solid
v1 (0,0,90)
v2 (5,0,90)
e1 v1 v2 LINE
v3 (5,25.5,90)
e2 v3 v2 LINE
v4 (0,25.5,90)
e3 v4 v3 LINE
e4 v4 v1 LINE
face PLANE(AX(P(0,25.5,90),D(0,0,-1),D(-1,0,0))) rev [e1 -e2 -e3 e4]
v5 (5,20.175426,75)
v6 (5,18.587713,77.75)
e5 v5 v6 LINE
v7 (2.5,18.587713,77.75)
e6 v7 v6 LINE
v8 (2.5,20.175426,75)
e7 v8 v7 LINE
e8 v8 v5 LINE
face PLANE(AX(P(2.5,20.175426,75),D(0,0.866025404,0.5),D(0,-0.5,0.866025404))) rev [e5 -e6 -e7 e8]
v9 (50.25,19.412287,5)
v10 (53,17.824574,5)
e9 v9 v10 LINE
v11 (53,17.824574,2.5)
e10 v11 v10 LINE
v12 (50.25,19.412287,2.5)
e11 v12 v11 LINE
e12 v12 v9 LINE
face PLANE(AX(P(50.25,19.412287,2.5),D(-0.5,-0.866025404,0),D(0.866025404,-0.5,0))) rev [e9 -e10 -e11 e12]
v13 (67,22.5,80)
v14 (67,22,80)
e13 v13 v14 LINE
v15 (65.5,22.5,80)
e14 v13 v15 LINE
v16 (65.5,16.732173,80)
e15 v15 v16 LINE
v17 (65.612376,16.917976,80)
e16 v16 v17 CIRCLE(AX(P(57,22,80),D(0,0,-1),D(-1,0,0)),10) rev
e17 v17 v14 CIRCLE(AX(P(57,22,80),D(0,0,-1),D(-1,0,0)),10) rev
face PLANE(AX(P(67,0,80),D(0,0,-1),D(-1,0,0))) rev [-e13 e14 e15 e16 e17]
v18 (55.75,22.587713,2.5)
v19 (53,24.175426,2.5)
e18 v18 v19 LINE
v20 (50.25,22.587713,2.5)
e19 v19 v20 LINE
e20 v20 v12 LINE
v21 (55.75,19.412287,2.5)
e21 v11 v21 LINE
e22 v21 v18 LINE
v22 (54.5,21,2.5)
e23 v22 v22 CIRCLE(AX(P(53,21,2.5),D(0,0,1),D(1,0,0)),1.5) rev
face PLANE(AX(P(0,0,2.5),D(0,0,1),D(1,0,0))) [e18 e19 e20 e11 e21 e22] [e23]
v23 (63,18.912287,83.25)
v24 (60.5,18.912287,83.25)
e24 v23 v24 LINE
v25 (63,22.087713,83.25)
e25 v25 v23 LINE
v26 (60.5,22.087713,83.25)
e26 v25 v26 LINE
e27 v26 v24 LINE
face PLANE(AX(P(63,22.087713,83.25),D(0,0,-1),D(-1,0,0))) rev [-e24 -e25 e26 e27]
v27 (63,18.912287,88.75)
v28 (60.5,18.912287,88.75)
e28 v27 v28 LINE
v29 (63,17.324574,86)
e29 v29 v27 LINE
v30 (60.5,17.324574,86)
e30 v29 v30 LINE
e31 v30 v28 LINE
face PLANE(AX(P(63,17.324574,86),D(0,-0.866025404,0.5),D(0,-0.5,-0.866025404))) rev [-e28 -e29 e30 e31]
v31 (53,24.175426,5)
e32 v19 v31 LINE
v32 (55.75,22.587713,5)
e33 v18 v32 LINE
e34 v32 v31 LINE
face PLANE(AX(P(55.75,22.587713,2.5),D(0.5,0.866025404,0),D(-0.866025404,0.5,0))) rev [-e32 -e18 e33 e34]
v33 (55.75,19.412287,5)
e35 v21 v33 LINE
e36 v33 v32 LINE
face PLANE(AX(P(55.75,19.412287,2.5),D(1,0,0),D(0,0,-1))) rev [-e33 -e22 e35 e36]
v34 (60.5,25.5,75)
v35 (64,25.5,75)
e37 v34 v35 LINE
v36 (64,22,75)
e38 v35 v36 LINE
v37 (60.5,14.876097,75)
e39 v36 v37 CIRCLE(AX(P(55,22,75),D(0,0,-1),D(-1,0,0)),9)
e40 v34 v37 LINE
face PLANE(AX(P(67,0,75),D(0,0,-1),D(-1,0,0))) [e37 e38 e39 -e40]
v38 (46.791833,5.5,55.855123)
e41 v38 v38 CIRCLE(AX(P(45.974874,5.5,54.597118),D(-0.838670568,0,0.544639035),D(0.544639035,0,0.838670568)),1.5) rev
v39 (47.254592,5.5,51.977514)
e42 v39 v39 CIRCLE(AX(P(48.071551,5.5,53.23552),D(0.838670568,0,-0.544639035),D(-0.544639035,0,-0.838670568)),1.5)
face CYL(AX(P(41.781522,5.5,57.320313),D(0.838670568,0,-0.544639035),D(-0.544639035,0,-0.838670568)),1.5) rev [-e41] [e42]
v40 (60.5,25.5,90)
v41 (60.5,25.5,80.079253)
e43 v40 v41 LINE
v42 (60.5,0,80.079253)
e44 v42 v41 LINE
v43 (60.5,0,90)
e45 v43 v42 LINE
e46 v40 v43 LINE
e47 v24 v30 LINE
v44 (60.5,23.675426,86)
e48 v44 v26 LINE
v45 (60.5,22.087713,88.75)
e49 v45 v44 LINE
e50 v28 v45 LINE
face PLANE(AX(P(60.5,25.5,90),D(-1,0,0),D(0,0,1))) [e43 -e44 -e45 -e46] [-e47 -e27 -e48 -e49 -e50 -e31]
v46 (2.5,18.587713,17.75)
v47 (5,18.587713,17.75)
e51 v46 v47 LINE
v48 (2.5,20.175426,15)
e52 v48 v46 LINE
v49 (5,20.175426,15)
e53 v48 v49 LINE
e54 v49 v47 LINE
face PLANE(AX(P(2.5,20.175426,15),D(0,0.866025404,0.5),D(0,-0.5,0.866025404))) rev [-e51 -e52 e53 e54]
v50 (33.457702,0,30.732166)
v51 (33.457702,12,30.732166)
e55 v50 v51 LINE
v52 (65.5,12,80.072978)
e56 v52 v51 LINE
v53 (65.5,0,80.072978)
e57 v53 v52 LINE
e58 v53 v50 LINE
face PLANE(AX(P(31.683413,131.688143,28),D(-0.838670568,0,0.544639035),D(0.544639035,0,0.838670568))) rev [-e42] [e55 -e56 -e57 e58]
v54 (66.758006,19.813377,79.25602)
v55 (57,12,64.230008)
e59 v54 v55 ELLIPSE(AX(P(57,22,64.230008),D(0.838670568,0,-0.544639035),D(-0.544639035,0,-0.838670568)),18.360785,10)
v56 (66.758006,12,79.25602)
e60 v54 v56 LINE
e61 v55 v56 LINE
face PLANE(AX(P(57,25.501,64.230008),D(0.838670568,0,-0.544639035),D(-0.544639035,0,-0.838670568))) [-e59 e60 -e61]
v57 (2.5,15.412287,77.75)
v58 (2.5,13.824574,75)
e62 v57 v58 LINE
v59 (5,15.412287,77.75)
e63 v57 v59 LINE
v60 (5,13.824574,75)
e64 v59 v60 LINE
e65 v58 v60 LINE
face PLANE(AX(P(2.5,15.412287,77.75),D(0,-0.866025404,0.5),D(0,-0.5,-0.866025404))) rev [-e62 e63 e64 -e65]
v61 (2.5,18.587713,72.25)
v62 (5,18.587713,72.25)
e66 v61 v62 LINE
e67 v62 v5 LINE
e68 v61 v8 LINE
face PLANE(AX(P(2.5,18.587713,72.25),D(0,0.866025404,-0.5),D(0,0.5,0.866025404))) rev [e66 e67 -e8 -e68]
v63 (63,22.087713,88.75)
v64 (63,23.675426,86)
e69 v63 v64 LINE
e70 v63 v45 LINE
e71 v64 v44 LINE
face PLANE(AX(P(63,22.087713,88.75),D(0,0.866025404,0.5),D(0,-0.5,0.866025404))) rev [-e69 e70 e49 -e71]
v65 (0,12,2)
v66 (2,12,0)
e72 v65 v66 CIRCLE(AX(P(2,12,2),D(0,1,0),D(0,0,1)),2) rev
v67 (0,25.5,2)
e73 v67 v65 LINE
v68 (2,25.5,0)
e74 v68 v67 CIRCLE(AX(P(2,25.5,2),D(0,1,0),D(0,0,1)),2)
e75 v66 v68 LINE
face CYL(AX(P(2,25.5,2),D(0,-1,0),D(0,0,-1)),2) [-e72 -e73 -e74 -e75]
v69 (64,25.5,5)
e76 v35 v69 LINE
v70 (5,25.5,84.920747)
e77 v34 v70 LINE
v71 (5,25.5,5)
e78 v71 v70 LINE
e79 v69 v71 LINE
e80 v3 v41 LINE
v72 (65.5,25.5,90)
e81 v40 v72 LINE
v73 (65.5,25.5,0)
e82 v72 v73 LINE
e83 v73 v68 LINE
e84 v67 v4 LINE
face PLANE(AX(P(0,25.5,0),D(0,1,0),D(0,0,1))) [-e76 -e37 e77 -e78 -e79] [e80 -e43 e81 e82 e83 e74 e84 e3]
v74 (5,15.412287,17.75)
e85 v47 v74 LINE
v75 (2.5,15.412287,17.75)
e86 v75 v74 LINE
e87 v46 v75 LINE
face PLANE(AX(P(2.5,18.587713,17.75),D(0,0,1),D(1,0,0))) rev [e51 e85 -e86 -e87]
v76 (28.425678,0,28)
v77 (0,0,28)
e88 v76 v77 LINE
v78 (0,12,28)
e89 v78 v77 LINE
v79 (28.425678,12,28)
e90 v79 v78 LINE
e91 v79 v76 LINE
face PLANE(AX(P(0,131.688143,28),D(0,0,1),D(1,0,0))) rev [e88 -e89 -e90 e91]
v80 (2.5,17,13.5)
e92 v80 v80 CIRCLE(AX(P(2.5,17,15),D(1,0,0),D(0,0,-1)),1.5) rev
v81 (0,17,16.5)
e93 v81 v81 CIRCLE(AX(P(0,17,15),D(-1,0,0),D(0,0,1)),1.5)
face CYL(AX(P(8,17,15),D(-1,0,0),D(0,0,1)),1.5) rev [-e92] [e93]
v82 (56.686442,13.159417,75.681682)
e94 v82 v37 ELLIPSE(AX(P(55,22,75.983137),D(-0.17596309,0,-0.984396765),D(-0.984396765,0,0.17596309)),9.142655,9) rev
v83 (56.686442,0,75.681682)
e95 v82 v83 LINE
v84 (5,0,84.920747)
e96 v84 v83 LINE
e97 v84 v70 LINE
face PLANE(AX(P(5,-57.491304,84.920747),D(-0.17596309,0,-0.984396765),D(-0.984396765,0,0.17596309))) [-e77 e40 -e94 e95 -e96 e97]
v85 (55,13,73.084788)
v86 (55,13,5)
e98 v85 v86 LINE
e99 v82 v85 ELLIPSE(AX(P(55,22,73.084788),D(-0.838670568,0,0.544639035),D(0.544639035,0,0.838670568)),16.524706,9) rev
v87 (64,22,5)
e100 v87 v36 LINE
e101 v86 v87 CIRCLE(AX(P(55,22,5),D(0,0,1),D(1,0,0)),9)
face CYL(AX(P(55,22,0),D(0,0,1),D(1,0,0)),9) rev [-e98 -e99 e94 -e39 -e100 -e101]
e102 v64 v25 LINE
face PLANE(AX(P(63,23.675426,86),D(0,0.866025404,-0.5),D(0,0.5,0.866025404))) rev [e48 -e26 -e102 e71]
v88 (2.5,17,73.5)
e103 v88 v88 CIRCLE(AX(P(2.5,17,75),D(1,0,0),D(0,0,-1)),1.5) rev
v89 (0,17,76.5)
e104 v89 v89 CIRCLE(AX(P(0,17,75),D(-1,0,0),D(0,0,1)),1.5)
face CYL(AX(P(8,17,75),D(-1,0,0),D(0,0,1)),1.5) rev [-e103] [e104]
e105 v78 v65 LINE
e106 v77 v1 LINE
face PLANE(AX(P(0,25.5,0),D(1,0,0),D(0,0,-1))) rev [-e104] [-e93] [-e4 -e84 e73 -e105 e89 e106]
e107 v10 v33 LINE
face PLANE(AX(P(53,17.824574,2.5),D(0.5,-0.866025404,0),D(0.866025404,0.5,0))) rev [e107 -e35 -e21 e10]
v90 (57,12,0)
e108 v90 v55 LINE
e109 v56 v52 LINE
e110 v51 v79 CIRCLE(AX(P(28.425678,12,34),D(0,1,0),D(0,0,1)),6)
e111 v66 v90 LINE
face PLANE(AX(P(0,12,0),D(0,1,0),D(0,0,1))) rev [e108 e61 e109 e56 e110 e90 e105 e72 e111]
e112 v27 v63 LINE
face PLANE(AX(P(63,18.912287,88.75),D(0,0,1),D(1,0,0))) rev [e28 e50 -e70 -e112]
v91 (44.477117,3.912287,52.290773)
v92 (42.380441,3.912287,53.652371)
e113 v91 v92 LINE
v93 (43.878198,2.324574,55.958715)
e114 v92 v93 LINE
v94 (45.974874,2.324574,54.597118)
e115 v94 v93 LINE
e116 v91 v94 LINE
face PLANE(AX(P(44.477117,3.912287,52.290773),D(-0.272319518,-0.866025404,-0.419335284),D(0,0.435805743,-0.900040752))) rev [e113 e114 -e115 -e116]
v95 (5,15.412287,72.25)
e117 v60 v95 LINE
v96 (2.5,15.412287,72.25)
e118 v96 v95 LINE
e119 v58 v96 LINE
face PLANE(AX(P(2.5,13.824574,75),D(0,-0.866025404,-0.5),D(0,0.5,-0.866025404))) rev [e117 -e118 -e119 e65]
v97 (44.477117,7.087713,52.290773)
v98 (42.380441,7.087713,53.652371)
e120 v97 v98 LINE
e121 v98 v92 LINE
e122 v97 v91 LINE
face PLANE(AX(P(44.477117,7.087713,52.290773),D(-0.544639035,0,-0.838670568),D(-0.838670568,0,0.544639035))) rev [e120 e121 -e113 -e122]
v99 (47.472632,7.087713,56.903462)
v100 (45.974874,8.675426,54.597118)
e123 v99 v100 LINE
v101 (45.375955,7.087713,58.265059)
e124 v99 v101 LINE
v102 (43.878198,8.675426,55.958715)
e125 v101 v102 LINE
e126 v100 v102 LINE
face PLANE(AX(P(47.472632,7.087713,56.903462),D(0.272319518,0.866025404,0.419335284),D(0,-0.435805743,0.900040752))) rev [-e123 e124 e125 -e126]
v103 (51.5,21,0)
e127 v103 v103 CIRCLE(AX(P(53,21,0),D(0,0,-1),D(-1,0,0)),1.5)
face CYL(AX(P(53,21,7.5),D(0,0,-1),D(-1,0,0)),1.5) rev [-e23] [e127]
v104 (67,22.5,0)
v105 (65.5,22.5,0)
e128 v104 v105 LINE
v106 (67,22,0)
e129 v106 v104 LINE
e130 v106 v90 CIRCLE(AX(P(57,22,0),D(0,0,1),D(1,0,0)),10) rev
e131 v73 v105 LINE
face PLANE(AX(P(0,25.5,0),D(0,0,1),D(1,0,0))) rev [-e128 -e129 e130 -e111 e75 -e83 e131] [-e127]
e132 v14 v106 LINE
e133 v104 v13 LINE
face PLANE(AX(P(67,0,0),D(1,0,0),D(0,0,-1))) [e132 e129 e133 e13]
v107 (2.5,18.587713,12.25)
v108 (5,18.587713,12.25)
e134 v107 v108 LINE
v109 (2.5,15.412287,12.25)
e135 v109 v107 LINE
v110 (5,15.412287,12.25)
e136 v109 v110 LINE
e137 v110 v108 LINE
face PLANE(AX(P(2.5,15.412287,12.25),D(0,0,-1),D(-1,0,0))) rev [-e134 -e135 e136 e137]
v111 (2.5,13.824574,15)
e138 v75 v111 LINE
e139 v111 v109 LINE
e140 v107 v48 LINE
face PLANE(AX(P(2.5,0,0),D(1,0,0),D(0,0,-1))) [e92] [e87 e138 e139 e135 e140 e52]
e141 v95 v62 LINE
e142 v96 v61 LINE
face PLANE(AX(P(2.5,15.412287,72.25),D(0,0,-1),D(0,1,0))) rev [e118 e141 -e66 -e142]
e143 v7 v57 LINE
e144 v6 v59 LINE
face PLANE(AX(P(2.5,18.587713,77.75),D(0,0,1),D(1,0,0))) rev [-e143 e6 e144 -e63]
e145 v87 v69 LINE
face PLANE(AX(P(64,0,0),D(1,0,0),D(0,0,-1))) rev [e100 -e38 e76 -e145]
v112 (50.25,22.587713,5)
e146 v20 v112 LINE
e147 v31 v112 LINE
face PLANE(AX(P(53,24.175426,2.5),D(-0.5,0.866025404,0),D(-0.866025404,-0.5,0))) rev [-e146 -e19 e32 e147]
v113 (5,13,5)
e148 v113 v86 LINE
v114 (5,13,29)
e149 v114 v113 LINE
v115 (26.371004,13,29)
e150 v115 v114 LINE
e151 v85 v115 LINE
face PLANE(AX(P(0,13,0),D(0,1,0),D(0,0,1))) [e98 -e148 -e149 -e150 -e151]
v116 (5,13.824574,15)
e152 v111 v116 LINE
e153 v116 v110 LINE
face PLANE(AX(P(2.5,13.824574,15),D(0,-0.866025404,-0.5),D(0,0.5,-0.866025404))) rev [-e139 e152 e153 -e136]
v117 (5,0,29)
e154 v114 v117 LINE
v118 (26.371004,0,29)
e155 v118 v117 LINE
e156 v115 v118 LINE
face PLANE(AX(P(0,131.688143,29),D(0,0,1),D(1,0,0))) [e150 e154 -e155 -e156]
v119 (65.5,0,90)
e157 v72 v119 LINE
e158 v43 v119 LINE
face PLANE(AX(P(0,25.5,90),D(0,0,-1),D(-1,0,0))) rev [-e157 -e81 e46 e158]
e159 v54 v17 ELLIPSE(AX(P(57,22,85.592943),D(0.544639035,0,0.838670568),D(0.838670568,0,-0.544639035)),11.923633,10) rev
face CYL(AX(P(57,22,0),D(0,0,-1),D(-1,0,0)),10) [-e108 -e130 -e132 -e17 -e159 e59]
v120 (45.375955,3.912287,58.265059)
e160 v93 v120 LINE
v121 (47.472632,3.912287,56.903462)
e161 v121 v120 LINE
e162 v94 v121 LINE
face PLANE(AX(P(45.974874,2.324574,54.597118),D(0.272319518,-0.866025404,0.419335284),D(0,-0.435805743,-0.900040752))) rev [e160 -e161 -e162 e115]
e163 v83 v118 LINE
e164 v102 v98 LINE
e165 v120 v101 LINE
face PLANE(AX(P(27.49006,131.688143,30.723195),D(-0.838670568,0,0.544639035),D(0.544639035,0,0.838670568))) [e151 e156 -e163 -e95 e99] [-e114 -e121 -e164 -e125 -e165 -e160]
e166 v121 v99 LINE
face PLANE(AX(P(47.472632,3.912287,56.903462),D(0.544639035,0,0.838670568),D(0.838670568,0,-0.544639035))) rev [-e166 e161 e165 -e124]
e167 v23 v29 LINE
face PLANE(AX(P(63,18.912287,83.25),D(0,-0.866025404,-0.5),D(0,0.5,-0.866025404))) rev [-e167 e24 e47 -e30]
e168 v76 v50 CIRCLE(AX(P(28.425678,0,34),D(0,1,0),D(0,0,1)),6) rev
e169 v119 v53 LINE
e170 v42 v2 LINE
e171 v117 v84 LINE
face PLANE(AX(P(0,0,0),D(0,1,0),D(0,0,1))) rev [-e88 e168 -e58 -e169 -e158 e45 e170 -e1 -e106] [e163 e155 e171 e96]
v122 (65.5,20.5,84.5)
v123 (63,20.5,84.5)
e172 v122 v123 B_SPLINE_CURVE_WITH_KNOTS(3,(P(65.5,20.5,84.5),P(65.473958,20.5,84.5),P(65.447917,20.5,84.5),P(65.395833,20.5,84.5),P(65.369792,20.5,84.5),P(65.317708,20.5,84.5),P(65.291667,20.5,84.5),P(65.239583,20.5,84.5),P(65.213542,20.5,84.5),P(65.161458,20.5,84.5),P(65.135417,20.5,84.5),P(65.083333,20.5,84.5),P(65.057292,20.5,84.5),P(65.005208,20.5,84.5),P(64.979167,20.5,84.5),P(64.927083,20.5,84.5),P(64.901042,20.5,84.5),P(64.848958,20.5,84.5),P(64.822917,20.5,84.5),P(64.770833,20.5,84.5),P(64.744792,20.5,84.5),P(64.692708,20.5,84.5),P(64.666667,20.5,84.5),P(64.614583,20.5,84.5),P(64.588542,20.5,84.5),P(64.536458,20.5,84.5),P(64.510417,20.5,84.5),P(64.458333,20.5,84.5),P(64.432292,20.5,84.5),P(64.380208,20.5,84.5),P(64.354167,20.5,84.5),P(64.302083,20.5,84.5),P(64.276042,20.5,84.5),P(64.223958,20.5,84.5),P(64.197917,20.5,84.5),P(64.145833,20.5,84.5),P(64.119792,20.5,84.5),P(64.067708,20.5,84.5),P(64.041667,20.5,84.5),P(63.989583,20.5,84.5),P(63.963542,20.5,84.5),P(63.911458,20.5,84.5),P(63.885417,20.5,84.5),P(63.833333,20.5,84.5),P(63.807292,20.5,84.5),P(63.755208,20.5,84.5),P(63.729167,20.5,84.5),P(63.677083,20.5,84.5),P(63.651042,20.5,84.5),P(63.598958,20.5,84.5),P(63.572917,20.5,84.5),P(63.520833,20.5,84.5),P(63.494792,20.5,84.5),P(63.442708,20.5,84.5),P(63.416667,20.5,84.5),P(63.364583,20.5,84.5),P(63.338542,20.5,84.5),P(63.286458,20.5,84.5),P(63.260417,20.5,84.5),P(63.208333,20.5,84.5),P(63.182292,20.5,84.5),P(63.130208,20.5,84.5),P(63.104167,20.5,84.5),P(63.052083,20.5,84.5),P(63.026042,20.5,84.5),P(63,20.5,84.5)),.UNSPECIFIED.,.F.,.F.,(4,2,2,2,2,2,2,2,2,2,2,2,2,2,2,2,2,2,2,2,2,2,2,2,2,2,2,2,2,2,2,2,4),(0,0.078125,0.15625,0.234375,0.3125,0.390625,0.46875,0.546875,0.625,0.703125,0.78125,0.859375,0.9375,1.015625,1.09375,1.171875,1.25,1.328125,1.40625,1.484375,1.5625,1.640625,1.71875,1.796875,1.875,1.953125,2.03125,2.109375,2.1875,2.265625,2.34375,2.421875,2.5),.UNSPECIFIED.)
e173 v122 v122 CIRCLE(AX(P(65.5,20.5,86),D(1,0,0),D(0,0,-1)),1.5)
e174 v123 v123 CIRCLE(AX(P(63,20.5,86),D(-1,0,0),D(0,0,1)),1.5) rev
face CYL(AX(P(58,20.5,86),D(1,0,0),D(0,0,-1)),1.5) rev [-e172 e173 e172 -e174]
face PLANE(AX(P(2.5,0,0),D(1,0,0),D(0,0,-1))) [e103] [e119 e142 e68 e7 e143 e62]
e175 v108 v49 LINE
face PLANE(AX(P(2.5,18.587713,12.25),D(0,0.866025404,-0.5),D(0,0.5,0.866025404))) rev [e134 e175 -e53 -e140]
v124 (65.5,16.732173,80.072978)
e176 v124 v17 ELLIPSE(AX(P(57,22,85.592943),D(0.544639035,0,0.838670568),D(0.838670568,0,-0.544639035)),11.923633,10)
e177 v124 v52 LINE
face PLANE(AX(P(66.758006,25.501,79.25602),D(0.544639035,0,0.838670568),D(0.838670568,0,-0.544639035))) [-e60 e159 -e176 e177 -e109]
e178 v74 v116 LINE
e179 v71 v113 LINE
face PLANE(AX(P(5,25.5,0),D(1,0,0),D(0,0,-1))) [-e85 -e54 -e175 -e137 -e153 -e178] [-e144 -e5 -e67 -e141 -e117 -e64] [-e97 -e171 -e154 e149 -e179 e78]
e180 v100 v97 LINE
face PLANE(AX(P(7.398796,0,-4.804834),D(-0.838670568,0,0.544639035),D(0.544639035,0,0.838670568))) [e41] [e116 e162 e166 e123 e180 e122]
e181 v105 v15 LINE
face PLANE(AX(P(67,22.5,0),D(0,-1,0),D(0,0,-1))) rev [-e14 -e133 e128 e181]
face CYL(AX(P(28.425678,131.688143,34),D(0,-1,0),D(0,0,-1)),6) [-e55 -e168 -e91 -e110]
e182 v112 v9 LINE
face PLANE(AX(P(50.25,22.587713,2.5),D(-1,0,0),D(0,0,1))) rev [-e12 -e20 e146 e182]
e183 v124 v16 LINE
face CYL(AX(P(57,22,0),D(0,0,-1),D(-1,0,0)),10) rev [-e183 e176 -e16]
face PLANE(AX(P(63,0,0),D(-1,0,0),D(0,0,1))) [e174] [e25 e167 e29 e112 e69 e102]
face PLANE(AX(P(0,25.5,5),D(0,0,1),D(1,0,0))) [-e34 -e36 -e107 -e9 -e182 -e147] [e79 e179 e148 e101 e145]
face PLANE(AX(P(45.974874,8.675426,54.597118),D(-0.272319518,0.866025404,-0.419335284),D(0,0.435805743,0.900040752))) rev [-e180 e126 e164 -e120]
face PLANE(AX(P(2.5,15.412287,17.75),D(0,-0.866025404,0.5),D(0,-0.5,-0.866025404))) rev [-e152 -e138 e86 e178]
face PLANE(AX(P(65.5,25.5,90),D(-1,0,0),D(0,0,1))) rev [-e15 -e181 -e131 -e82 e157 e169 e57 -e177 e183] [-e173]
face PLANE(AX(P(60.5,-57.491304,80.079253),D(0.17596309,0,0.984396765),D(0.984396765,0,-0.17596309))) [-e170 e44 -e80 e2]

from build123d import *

# Parameters (mm, degrees)
ESQUISSE1_W              = 65.5
ESQUISSE1_H              = 90
BOSS_EXTRU_1_DEPTH       = 25.5
CONG_2_R                 = 2
ESQUISSE6_W              = 80
ESQUISSE6_H              = 22.5
BOSS_EXTRU_2_DEPTH       = 1.5
ENL_V_MAT_EXTRU_5_DEPTH  = 12
COQUE1_DEPTH             = 25.5
COQUE1_START             = 13
COQUE1_2_DEPTH           = 12.5
COQUE1_3_OUTLINE_W       = 3.5
COQUE1_3_OUTLINE_H       = 70
COQUE1_3_DEPTH           = 4.5
ENL_V_MAT_EXTRU_12_DEPTH = 12.5
CONG_5_R                 = 9
CONG_4_R                 = 10
BOSS_EXTRU_3_REACH       = 115.01
BOSS_EXTRU_3_END_RADIUS  = 10
ESQUISSE5_R              = 1.5
ENL_V_MAT_EXTRU_4_DEPTH  = 8
CONG_3_R                 = 6
ESQUISSE11_R             = 1.5
ENL_V_MAT_EXTRU_7_DEPTH  = 7.5
ESQUISSE12_R             = 1.5
ENL_V_MAT_EXTRU_8_DEPTH  = 7.5
ENL_V_MAT_EXTRU_9_DEPTH  = 2.5
ENL_V_MAT_EXTRU_10_DEPTH = 2.5
ENL_V_MAT_EXTRU_11_DEPTH = 2.5
BOSS_EXTRU_7_START       = -25.5
BOSS_EXTRU_7_DEPTH       = 25.5
ENL_V_MAT_EXTRU_13_DEPTH = 116.061939841
ESQUISSE21_R             = 1.5
ENL_V_MAT_EXTRU_14_DEPTH = 7.5
ENL_V_MAT_EXTRU_15_DEPTH = 2.5


# Read off the part's stored shape, not the designer's step: Coque1
with BuildPart() as part:
    # Esquisse1 → Boss.-Extru.1 (new body)
    with BuildSketch(Plane(origin=(0, 0, 0), x_dir=(1, 0, 0), z_dir=(0, 1, 0))):
        with Locations((32.75, -45)):
            Rectangle(ESQUISSE1_W, ESQUISSE1_H)
    extrude(amount=BOSS_EXTRU_1_DEPTH)

    # Congé2
    cong_2_edges = [part.edges().sort_by_distance(p)[0] for p in [
        (0, 12.75, 0),
    ]]
    fillet(cong_2_edges, radius=CONG_2_R)

    # Esquisse6 → Boss.-Extru.2 (add)
    with BuildSketch(Plane(origin=(65.5, 0, 0), x_dir=(0, 0, -1), z_dir=(1, 0, 0))):
        with Locations((-40, 11.25)):
            Rectangle(ESQUISSE6_W, ESQUISSE6_H)
    extrude(amount=BOSS_EXTRU_2_DEPTH)

    # Esquisse8 → Enlèv. mat.-Extru.5 (cut)
    with BuildSketch(Plane.XZ):
        Polygon((0, 0), (67, 0), (67, 82.382775564), (31.68341261, 28), (0, 28), align=None)
    extrude(amount=-ENL_V_MAT_EXTRU_5_DEPTH, mode=Mode.SUBTRACT)

    # Coque1 outline → Coque1 (cut)
    with BuildSketch(Plane(origin=(0, 0, 0), x_dir=(1, 0, 0), z_dir=(0, 1, 0))):
        Polygon((60.5, -90), (60.5, -81.554045593), (26.371003739, -29), (5, -29), (5, -90), align=None)
    extrude(amount=COQUE1_DEPTH, mode=Mode.SUBTRACT)

    # Coque1 2 outline → Coque1 2 (cut)
    with BuildSketch(Plane(origin=(0, 0, 0), x_dir=(1, 0, 0), z_dir=(0, 1, 0)).offset(COQUE1_START)):
        Polygon((60.5, -81.554045593), (60.5, -5), (5, -5), (5, -29), (26.371003739, -29), align=None)
    extrude(amount=COQUE1_2_DEPTH, mode=Mode.SUBTRACT)

    # Coque1 3 outline → Coque1 3 (cut)
    with BuildSketch(Plane(origin=(0, 0, 0), x_dir=(1, 0, 0), z_dir=(0, 1, 0)).offset(COQUE1_START)):
        with Locations((62.25, -40)):
            Rectangle(COQUE1_3_OUTLINE_W, COQUE1_3_OUTLINE_H)
    extrude(amount=COQUE1_3_DEPTH, mode=Mode.SUBTRACT)

    # Esquisse17 → Enlèv. mat.-Extru.12 (cut)
    with BuildSketch(Plane(origin=(0, 13, 0), x_dir=(1, 0, 0), z_dir=(0, 1, 0))):
        Polygon((5, -5), (5, -29), (26.371003739, -29), (60.5, -81.554045593), (60.5, -75), (64, -75), (64, -5), align=None)
    extrude(amount=ENL_V_MAT_EXTRU_12_DEPTH, mode=Mode.SUBTRACT)

    # Congé5
    cong_5_edges = [part.edges().sort_by_distance(p)[0] for p in [
        (64, 13, 40),
    ]]
    fillet(cong_5_edges, radius=CONG_5_R)

    # Congé4
    cong_4_edges = [part.edges().sort_by_distance(p)[0] for p in [
        (67, 12, 40),
    ]]
    fillet(cong_4_edges, radius=CONG_4_R)

    # Boss.-Extru.3: up to this cylinder (the profile starts outside it)
    boss_extru_3_end = Plane(origin=(57, 22, 72.615279), z_dir=(0, 0, -1)) * Cylinder(BOSS_EXTRU_3_END_RADIUS, 251.02, mode=Mode.PRIVATE)
    # Esquisse9 → Boss.-Extru.3 (add, up to the surface)
    with BuildSketch(Plane.XZ.offset(-12), mode=Mode.PRIVATE) as boss_extru_3_sk1:
        Polygon((57, 66.984125926), (57, 64.230008238), (66.758005852, 79.256019566), (65.5, 80.072978118), align=None)
    boss_extru_3_tool1 = extrude(boss_extru_3_sk1.sketch, amount=-BOSS_EXTRU_3_REACH, mode=Mode.PRIVATE) - boss_extru_3_end
    add(boss_extru_3_tool1.solids().sort_by_distance((61.571725, 12, 72.615279))[0])

    # Esquisse5 → Enlèv. mat.-Extru.4 (cut)
    with BuildSketch(Plane.ZY):
        with Locations((15, 17)):
            Circle(ESQUISSE5_R)
        with Locations((75, 17)):
            Circle(ESQUISSE5_R)
    extrude(amount=-ENL_V_MAT_EXTRU_4_DEPTH, mode=Mode.SUBTRACT)

    # Congé3
    cong_3_edges = [part.edges().sort_by_distance(p)[0] for p in [
        (31.68341261, 6, 28),
    ]]
    fillet(cong_3_edges, radius=CONG_3_R)

    # Esquisse11 → Enlèv. mat.-Extru.7 (cut)
    with BuildSketch(Plane(origin=(9.495472341, 0, -6.166431839), x_dir=(-0.5446390350150254, 0, -0.8386705679454252), z_dir=(0.8386705679454252, 0, -0.5446390350150254))):
        with Locations((-70.828706829, 5.5)):
            Circle(ESQUISSE11_R)
    extrude(amount=-ENL_V_MAT_EXTRU_7_DEPTH, mode=Mode.SUBTRACT)

    # Esquisse12 → Enlèv. mat.-Extru.8 (cut)
    with BuildSketch(Plane(origin=(65.5, 0, 0), x_dir=(0, 0, -1), z_dir=(1, 0, 0))):
        with Locations((-86, 20.5)):
            Circle(ESQUISSE12_R)
    extrude(amount=-ENL_V_MAT_EXTRU_8_DEPTH, mode=Mode.SUBTRACT)

    # Esquisse13 → Enlèv. mat.-Extru.9 (cut)
    with BuildSketch(Plane(origin=(5, 0, 0), x_dir=(0, 0, -1), z_dir=(1, 0, 0))):
        Polygon((-72.25, 18.58771324), (-75, 20.175426481), (-77.75, 18.58771324), (-77.75, 15.41228676), (-75, 13.824573519), (-72.25, 15.41228676), align=None)
        Polygon((-12.25, 18.58771324), (-15, 20.175426481), (-17.75, 18.58771324), (-17.75, 15.41228676), (-15, 13.824573519), (-12.25, 15.41228676), align=None)
    extrude(amount=-ENL_V_MAT_EXTRU_9_DEPTH, mode=Mode.SUBTRACT)

    # Esquisse14 → Enlèv. mat.-Extru.10 (cut)
    with BuildSketch(Plane.ZY.offset(-60.5)):
        Polygon((88.75, 22.08771324), (86, 23.675426481), (83.25, 22.08771324), (83.25, 18.91228676), (86, 17.324573519), (88.75, 18.91228676), align=None)
    extrude(amount=-ENL_V_MAT_EXTRU_10_DEPTH, mode=Mode.SUBTRACT)

    # Esquisse15 → Enlèv. mat.-Extru.11 (cut)
    with BuildSketch(Plane(origin=(5.302119501, 0, -3.443236664), x_dir=(0.5446390350150254, 0, 0.8386705679454252), z_dir=(-0.8386705679454252, 0, 0.5446390350150254))):
        Polygon((73.578706829, 3.91228676), (73.578706829, 7.08771324), (70.828706829, 8.675426481), (68.078706829, 7.08771324), (68.078706829, 3.91228676), (70.828706829, 2.324573519), align=None)
    extrude(amount=-ENL_V_MAT_EXTRU_11_DEPTH, mode=Mode.SUBTRACT)

    # Esquisse18 → Boss.-Extru.7 (add)
    with BuildSketch(Plane(origin=(0, 25.5, 0), x_dir=(1, 0, 0), z_dir=(0, 1, 0)).offset(BOSS_EXTRU_7_START)):
        Polygon((5, -90), (5, -84.920747226), (60.5, -75), (60.5, -80.079252774), align=None)
    extrude(amount=BOSS_EXTRU_7_DEPTH)

    # Esquisse19 → Enlèv. mat.-Extru.13 (cut, through all)
    with BuildSketch(Plane(origin=(0, 25.5, 0), x_dir=(1, 0, 0), z_dir=(0, 1, 0))):
        Polygon((60.5, -81.554045593), (60.5, -80.079252774), (59.641872403, -80.232644972), align=None)
    extrude(amount=-ENL_V_MAT_EXTRU_13_DEPTH, mode=Mode.SUBTRACT)

    # Esquisse21 → Enlèv. mat.-Extru.14 (cut)
    with BuildSketch(Plane(origin=(0, 0, 0), x_dir=(-1, 0, 0), z_dir=(0, 0, -1))):
        with Locations((-53, 21)):
            Circle(ESQUISSE21_R)
    extrude(amount=-ENL_V_MAT_EXTRU_14_DEPTH, mode=Mode.SUBTRACT)

    # Esquisse22 → Enlèv. mat.-Extru.15 (cut)
    with BuildSketch(Plane.XY.offset(5)):
        Polygon((53, 17.824573519), (55.75, 19.41228676), (55.75, 22.58771324), (53, 24.175426481), (50.25, 22.58771324), (50.25, 19.41228676), align=None)
    extrude(amount=-ENL_V_MAT_EXTRU_15_DEPTH, mode=Mode.SUBTRACT)


solid = part.part
